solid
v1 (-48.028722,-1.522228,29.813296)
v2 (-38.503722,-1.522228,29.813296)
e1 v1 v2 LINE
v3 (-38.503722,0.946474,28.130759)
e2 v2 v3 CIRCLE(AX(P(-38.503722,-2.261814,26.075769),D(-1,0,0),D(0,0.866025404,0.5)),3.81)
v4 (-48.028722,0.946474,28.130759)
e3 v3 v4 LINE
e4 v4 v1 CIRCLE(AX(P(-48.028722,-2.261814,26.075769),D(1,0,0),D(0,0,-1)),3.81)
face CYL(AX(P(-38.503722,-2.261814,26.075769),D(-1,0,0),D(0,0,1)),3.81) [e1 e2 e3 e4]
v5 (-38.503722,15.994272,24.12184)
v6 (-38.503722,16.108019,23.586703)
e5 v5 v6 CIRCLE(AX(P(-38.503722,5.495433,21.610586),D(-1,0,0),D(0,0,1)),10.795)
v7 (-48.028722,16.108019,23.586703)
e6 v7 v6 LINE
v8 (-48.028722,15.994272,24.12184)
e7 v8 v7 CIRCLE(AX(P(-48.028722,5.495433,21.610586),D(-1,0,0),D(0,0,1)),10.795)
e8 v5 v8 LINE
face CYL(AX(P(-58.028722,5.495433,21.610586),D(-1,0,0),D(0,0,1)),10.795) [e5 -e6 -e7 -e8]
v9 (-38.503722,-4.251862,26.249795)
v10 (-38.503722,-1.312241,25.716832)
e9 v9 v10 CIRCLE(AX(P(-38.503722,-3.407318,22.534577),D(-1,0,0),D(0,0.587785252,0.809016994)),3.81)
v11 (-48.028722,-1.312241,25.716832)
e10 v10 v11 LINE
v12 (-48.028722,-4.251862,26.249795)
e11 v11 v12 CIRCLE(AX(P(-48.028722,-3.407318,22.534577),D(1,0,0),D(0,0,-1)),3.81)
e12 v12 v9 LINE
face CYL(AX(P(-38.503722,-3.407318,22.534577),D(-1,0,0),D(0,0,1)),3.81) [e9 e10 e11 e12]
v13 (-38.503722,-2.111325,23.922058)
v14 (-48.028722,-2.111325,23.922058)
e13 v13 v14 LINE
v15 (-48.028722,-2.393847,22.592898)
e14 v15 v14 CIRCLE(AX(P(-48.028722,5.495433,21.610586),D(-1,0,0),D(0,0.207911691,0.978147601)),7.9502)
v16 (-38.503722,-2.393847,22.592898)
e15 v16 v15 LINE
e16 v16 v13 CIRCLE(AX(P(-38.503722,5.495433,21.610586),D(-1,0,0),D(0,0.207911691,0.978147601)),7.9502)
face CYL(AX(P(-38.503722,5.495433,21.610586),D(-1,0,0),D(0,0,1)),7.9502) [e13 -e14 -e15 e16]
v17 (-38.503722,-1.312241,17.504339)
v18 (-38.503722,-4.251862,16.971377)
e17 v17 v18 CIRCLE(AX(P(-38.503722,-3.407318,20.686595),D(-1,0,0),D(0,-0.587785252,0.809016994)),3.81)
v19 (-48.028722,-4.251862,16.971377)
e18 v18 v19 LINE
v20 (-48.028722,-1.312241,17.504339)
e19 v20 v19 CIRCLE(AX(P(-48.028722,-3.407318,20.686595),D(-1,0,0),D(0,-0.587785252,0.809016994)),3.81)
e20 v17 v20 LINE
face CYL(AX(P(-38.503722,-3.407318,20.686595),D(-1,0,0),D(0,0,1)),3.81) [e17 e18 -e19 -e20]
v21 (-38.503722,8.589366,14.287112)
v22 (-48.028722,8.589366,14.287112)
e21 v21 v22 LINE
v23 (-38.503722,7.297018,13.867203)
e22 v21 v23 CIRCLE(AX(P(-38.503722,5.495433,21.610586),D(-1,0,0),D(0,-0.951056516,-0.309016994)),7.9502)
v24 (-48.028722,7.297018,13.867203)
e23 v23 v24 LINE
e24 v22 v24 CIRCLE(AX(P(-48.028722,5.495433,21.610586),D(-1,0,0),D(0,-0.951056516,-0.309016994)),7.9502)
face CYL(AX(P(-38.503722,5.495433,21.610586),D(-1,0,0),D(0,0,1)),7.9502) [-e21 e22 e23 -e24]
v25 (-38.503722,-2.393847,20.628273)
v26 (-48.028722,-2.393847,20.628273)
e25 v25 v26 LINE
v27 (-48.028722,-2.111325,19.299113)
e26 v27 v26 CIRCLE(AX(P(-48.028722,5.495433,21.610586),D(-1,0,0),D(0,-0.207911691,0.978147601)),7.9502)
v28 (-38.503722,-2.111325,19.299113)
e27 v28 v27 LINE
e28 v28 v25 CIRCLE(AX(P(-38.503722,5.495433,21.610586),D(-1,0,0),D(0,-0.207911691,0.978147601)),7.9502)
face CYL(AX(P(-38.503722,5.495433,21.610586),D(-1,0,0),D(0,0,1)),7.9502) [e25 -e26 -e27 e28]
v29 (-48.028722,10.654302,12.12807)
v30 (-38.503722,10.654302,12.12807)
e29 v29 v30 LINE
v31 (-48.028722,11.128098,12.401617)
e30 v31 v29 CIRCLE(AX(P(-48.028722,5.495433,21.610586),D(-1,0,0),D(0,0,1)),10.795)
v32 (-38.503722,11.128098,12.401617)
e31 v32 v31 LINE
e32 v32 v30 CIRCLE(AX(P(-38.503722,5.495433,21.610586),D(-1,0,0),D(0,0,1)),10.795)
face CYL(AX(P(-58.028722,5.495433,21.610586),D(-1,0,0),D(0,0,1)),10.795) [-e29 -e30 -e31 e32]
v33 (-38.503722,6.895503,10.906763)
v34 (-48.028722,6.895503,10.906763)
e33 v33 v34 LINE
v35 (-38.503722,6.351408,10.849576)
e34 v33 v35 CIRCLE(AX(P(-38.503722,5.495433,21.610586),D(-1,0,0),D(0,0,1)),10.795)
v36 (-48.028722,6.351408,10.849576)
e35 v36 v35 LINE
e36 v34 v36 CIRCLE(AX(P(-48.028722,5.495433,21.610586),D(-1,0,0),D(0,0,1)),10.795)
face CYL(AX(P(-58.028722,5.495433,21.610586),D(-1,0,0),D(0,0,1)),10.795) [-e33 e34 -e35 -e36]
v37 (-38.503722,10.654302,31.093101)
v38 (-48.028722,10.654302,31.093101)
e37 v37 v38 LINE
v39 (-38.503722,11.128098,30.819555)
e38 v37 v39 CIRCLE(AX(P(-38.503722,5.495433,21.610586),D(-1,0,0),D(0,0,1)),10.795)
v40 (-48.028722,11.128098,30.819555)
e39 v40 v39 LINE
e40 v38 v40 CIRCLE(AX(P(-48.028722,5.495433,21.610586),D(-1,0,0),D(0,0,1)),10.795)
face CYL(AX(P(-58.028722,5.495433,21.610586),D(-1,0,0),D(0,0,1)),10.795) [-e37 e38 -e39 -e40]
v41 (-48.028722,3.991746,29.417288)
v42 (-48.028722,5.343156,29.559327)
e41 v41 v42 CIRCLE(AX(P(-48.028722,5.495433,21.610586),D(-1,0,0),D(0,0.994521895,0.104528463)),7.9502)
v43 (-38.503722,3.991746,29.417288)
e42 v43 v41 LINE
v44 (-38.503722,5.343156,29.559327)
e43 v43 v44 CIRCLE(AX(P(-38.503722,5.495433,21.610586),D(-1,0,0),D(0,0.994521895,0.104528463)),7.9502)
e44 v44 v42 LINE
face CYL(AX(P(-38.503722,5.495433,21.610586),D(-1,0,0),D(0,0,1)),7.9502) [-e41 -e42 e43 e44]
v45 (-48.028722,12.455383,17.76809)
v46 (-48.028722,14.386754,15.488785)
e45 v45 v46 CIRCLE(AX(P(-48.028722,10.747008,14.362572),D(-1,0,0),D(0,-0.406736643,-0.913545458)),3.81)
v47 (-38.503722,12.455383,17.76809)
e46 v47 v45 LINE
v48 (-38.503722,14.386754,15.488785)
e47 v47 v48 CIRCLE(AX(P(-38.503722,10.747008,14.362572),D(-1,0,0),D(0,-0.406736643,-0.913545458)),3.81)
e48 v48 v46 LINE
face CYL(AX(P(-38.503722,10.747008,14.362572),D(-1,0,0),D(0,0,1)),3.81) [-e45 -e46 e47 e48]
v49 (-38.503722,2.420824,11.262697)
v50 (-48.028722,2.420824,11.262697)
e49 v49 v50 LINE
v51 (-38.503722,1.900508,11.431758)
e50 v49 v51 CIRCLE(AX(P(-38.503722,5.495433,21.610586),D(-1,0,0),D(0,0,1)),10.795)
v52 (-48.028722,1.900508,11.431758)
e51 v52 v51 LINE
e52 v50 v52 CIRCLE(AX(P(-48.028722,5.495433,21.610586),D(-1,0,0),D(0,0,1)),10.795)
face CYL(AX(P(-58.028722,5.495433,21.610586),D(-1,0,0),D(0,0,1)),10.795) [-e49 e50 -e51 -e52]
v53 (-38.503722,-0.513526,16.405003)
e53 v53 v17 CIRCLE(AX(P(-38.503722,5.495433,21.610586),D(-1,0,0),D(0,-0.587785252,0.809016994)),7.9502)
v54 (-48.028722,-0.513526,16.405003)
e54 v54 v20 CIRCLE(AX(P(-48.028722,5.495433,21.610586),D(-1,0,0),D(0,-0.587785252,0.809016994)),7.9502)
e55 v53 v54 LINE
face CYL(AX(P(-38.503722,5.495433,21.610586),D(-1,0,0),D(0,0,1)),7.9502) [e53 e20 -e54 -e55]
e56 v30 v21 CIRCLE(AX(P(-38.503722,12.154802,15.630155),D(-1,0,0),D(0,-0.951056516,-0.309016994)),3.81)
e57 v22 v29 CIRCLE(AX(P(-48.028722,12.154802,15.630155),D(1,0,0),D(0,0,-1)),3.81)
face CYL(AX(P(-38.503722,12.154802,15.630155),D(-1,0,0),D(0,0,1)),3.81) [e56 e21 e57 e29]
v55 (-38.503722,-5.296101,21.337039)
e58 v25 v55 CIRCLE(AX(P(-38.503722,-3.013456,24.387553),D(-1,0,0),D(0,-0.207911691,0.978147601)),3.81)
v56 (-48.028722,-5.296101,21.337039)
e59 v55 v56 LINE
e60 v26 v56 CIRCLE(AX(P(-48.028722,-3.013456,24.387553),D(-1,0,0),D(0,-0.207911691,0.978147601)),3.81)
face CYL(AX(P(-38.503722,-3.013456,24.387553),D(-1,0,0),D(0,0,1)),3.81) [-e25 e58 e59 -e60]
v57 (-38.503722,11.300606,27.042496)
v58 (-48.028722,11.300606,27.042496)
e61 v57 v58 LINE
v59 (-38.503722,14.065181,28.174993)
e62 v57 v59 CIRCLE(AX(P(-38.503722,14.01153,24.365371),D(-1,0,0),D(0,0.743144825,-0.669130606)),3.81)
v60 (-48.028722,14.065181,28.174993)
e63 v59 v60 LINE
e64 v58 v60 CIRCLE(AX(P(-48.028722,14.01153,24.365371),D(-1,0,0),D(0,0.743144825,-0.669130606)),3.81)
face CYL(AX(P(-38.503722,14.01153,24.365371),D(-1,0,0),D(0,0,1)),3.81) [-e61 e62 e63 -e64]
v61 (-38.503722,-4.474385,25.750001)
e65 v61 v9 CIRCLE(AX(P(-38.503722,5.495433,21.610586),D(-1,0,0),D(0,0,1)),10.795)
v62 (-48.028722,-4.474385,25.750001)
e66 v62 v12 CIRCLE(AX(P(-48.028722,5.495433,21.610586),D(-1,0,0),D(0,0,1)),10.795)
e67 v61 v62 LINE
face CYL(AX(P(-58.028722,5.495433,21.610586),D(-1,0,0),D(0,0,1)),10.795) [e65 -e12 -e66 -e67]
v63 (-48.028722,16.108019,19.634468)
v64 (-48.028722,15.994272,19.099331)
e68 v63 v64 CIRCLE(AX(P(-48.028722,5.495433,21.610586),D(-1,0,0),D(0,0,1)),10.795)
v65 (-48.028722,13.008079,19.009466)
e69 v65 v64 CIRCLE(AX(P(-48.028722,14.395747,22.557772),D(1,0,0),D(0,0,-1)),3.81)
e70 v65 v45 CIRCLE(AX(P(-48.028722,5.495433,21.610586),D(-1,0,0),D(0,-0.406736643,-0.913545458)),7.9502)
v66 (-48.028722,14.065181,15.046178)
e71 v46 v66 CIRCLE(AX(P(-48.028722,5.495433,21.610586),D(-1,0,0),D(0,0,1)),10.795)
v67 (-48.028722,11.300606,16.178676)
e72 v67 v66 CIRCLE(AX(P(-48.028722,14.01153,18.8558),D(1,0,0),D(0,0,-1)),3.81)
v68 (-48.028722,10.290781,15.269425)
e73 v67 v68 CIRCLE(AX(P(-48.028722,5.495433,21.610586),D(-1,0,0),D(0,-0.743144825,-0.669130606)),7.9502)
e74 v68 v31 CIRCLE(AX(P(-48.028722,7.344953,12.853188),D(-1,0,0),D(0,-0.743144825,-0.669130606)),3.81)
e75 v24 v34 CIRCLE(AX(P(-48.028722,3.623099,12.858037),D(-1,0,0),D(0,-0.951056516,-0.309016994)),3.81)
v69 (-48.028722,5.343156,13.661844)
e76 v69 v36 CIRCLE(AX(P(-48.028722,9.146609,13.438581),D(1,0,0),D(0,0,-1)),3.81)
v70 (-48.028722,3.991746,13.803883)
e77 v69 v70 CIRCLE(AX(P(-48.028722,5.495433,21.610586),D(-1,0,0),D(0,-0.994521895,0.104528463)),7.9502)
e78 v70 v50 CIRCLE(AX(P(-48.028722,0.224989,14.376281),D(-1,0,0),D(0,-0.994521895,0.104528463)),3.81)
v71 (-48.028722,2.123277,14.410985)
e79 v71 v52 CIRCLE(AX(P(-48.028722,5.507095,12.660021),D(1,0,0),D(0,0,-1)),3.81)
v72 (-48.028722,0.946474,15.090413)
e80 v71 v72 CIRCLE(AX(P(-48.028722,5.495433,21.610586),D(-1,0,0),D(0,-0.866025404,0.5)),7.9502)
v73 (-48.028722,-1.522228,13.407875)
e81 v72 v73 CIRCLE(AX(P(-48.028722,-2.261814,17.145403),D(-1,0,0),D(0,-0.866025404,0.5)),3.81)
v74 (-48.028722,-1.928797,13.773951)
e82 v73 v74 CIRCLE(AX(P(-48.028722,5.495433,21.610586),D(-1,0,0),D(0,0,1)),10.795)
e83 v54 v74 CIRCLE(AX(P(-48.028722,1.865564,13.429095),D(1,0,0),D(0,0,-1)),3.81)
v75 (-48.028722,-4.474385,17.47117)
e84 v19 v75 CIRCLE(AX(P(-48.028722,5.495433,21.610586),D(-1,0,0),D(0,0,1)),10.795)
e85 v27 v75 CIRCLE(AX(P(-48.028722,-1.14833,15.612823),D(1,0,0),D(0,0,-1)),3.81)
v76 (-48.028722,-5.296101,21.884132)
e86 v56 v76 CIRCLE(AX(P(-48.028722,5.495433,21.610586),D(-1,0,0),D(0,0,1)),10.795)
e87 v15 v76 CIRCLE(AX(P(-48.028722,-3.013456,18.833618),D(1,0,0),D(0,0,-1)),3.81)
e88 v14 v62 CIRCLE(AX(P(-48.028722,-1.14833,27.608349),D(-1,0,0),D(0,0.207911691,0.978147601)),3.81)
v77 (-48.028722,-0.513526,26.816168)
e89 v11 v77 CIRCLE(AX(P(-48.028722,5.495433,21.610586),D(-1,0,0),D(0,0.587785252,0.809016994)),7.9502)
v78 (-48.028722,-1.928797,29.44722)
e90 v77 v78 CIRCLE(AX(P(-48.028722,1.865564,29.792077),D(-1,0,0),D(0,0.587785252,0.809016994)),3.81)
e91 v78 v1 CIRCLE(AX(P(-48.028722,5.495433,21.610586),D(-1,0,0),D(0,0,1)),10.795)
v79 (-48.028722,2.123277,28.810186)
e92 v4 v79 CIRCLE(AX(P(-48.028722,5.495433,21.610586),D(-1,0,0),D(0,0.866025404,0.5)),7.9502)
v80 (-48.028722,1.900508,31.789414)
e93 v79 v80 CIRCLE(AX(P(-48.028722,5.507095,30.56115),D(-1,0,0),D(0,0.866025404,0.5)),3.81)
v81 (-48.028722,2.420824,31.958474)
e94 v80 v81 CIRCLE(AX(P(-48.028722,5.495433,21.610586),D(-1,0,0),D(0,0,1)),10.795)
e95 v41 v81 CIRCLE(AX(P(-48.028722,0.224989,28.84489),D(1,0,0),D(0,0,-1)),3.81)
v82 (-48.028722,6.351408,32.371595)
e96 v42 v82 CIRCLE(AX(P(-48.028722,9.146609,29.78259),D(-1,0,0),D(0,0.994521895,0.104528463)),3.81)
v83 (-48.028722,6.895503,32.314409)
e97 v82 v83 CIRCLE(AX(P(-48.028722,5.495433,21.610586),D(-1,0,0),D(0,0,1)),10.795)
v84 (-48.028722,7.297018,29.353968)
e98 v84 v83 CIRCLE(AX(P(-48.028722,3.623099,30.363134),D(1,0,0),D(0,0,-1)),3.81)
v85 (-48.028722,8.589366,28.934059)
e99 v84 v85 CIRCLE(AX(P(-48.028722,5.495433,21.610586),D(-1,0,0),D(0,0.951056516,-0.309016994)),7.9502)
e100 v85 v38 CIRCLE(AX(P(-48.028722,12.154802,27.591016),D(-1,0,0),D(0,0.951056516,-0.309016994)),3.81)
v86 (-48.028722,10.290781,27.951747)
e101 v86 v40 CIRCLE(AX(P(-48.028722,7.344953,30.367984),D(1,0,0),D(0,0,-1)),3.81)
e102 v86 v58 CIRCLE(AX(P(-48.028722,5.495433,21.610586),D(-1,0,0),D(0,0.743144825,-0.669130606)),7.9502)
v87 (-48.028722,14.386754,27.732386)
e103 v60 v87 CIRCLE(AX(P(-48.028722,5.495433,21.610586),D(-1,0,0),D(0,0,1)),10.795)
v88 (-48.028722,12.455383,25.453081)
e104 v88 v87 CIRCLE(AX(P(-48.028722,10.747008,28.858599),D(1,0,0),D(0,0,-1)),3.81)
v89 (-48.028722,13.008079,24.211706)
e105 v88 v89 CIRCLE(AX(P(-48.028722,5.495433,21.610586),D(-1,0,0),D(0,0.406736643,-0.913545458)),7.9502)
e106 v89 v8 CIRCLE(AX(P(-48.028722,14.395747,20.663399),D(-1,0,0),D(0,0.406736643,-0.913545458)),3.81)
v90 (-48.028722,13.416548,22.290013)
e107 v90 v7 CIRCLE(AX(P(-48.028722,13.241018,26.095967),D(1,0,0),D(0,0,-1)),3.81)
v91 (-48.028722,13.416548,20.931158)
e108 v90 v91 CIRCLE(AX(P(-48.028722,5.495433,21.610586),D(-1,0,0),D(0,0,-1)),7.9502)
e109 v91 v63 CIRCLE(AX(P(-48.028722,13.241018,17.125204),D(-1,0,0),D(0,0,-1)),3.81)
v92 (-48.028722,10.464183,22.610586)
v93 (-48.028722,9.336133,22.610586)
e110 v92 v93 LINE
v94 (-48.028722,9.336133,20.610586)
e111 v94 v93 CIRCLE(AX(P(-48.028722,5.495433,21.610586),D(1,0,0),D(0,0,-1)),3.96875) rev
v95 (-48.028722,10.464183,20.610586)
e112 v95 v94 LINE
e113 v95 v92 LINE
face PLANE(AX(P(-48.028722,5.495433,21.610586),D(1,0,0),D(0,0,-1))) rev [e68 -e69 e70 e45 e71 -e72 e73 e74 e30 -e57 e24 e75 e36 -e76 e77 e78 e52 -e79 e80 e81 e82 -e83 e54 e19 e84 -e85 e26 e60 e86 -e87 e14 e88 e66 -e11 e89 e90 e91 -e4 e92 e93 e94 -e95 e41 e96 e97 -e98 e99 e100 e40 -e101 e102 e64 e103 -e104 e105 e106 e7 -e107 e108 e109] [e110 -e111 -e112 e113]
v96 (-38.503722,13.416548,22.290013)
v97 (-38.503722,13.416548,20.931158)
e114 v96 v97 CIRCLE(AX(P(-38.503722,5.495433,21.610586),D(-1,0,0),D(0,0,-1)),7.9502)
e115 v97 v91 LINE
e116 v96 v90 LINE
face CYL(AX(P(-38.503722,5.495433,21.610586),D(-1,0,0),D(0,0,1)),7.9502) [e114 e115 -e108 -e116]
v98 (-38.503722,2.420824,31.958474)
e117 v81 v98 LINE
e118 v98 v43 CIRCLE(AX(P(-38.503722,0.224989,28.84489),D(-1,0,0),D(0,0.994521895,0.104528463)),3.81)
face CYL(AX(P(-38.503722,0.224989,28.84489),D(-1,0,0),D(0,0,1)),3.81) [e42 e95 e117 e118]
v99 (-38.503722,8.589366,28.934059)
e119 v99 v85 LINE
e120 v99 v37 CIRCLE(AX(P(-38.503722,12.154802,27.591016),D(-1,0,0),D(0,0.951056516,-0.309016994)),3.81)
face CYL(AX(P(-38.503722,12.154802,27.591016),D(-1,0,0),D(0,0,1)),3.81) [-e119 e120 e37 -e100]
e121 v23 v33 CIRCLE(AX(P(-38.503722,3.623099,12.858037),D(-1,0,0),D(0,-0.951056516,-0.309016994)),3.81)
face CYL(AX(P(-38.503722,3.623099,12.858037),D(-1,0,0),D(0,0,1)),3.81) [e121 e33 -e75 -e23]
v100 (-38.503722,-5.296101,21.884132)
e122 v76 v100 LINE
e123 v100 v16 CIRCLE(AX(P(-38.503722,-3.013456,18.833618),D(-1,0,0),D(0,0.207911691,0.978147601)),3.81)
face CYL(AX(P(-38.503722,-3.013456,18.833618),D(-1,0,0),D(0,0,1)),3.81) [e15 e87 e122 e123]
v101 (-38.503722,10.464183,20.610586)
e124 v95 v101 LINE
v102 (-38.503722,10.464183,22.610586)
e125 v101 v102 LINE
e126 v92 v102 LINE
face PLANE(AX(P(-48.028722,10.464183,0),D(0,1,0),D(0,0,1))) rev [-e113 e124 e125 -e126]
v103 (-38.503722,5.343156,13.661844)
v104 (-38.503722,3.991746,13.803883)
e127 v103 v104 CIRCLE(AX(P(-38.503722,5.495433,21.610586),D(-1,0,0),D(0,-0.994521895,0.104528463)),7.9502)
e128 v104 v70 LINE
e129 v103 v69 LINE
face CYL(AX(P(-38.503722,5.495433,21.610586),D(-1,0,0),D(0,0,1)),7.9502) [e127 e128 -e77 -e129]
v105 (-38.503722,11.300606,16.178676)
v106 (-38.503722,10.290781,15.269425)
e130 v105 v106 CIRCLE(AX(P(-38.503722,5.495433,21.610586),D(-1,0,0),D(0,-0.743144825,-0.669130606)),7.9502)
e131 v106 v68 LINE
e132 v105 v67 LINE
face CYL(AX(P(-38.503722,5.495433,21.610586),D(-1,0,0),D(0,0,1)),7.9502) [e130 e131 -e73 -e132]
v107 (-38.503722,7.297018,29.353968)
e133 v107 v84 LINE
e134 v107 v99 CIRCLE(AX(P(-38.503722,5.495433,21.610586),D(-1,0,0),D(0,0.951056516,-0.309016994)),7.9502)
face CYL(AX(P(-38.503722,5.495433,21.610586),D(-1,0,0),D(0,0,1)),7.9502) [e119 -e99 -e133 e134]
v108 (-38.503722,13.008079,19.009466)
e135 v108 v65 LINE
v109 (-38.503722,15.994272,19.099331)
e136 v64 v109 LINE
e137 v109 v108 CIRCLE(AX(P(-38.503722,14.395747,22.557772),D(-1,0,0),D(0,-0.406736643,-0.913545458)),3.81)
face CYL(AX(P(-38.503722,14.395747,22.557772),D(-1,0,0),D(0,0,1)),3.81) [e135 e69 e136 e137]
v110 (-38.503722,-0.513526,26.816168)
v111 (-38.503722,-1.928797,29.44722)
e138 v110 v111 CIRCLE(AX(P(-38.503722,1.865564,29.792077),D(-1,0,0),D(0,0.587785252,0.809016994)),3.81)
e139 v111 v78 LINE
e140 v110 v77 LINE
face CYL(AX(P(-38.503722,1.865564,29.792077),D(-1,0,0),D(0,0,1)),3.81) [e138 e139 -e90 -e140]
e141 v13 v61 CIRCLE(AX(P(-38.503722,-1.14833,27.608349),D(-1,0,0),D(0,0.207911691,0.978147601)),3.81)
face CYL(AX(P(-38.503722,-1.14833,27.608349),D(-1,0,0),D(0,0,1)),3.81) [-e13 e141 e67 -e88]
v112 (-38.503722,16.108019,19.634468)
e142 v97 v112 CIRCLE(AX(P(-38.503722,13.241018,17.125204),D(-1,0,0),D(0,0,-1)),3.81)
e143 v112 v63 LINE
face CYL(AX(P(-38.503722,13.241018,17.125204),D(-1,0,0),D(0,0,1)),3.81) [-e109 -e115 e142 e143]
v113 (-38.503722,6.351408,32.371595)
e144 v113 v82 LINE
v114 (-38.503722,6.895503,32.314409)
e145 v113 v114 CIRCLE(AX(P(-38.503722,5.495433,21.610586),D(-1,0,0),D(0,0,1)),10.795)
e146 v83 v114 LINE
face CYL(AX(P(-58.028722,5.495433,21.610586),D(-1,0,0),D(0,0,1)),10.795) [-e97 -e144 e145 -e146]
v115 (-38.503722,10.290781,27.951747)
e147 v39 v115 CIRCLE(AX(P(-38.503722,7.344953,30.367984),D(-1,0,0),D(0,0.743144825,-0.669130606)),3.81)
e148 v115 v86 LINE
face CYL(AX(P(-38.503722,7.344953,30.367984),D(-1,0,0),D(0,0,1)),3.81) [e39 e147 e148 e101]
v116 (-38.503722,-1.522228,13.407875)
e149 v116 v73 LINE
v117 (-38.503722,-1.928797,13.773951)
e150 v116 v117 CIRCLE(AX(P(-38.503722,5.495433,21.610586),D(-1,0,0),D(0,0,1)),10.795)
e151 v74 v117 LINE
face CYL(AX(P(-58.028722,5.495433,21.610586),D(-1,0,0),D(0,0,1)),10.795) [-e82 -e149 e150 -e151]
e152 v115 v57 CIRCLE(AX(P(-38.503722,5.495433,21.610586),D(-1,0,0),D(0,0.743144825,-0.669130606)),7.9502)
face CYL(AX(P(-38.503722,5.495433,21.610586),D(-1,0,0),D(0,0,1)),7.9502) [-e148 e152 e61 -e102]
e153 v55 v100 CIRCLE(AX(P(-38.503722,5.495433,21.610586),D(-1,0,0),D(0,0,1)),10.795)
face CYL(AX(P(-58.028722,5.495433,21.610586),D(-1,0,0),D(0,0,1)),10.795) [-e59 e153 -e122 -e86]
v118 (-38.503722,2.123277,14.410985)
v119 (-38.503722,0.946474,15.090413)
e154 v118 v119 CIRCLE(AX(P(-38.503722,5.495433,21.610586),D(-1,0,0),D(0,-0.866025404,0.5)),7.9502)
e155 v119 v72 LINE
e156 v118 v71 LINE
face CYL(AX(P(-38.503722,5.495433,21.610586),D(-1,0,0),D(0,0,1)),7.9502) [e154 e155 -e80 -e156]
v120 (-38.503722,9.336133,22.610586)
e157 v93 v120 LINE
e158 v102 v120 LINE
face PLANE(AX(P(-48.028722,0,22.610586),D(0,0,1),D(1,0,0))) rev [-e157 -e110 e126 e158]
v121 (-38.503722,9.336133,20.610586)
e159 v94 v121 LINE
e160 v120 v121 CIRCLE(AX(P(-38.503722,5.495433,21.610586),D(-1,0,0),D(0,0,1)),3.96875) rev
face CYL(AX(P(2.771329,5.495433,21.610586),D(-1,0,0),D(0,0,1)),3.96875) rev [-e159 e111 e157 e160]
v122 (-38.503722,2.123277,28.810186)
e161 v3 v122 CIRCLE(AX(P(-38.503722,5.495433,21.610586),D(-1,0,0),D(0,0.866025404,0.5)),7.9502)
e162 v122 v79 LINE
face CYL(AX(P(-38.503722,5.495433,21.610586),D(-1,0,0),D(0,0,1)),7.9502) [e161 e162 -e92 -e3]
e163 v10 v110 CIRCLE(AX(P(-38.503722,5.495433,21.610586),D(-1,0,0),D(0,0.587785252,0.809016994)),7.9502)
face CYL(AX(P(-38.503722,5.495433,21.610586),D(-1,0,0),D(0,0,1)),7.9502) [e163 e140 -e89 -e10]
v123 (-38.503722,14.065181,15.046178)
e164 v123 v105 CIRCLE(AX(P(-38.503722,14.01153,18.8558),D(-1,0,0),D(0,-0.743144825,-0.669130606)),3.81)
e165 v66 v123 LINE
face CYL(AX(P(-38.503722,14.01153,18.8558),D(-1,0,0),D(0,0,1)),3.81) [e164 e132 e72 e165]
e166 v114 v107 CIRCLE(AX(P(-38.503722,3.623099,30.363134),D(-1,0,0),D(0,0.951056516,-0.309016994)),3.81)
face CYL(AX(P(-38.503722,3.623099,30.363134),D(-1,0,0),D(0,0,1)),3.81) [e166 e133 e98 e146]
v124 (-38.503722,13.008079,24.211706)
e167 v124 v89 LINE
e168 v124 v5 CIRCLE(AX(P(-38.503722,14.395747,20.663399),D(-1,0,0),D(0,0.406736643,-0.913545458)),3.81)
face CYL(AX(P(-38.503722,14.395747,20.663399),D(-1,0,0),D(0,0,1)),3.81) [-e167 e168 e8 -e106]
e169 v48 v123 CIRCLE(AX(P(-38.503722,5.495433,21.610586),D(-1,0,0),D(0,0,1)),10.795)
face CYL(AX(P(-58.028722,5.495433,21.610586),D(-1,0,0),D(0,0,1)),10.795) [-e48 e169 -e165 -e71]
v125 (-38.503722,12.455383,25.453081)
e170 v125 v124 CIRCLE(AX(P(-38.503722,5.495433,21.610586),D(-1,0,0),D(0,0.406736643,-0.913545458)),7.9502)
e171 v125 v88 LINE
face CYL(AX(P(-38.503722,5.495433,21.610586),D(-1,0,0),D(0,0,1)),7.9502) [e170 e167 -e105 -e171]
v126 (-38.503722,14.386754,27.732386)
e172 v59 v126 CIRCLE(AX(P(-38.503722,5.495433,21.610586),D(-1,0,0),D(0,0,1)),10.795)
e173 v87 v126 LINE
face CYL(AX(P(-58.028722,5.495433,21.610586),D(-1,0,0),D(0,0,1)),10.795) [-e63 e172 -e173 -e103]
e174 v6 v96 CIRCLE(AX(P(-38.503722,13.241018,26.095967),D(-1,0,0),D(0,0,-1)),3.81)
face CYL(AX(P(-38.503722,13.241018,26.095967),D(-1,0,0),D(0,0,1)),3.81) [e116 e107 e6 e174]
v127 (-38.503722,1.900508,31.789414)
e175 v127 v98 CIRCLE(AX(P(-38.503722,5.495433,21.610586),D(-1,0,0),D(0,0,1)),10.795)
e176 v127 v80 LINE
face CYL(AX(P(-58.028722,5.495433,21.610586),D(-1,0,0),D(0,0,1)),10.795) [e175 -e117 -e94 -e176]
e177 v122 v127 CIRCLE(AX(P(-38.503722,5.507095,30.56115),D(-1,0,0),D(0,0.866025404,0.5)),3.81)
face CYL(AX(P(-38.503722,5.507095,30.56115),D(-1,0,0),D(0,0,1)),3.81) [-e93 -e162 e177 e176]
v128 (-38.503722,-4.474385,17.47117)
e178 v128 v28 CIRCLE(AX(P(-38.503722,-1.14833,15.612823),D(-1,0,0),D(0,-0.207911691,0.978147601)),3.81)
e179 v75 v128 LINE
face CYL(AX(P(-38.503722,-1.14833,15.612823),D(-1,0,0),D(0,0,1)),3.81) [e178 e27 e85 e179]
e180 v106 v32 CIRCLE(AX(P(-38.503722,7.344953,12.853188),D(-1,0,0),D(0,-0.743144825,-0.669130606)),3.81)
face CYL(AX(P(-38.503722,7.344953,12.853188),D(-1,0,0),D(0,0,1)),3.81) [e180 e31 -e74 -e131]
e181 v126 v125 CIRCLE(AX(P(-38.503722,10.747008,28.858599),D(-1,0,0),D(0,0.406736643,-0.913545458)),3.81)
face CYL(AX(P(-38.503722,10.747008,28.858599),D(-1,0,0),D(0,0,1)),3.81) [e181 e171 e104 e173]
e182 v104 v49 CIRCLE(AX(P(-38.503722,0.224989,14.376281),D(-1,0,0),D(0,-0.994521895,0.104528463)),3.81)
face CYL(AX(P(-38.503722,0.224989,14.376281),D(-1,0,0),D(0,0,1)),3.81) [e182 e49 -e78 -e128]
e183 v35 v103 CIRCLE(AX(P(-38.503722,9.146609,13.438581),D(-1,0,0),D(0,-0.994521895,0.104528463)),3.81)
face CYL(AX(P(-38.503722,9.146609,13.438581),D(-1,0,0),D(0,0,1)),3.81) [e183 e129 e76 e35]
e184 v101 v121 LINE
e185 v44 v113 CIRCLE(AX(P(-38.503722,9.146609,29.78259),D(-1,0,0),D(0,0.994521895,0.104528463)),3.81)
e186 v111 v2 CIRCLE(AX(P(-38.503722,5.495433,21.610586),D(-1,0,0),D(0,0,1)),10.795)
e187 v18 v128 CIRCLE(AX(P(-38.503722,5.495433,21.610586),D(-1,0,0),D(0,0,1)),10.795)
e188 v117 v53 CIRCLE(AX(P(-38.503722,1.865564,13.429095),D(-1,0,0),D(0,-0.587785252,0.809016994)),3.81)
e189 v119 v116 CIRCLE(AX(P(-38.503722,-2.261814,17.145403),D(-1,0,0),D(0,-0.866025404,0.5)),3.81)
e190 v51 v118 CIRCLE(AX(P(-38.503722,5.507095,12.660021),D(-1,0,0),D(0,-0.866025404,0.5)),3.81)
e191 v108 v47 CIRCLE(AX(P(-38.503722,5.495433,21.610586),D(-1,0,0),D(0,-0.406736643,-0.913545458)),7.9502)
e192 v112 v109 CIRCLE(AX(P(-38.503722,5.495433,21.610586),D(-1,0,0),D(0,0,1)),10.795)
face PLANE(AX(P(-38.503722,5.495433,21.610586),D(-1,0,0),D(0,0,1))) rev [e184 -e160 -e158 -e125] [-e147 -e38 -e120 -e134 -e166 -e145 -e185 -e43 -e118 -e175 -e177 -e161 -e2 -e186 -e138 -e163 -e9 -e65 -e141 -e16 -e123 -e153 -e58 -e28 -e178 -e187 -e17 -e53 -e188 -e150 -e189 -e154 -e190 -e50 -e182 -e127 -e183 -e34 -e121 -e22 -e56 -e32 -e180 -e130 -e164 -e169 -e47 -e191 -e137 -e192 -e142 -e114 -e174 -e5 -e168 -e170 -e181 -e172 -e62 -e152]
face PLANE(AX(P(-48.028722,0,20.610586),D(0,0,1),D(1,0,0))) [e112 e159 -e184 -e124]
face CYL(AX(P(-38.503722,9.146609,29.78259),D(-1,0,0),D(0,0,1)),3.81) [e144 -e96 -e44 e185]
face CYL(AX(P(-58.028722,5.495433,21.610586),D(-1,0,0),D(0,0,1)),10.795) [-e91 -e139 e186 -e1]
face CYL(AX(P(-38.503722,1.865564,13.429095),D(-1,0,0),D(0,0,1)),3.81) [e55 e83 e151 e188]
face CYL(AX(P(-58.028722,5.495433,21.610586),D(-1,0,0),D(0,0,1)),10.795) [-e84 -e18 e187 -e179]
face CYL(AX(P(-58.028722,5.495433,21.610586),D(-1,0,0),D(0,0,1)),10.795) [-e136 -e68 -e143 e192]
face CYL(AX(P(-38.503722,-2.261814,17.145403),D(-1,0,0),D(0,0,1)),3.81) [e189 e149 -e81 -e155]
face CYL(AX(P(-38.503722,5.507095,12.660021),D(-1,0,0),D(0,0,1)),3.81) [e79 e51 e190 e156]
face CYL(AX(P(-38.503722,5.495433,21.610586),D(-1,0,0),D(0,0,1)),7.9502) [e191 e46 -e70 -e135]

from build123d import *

# Parameters (mm, degrees)
SPUR_START             = -48.028721504
SPUR_GEAR_AI_OUTLINE_R = 3.96875
SPUR_GEAR_AI_DEPTH     = 9.525
CUT_EXTRUDE1_DEPTH     = 38.391363975


# Read off the part's stored shape, not the designer's step: spur gear_ai
with BuildPart() as part:
    # spur gear_ai outline → spur gear_ai (new body)
    with BuildSketch(Plane.YZ.offset(SPUR_START)):
        with BuildLine():
            ThreePointArc((14.065180693, 15.046177845), (14.228771479, 15.265443857), (14.386753515, 15.488784863))
            ThreePointArc((14.386753515, 15.488784863), (13.653794557, 16.82563811), (12.455383467, 17.768090388))
            ThreePointArc((12.455383467, 17.768090388), (12.758302122, 18.376947995), (13.008079359, 19.009465686))
            ThreePointArc((13.008079359, 19.009465686), (14.510351432, 18.74949635), (15.994272276, 19.099331116))
            ThreePointArc((15.994272276, 19.099331116), (16.054536374, 19.366178952), (16.108019174, 19.634468198))
            ThreePointArc((16.108019174, 19.634468198), (14.894680646, 20.557623143), (13.416547762, 20.931158437))
            ThreePointArc((13.416547762, 20.931158437), (13.445633024, 21.610585655), (13.416547762, 22.290012873))
            ThreePointArc((13.416547762, 22.290012873), (14.894680646, 22.663548167), (16.108019174, 23.586703112))
            ThreePointArc((16.108019174, 23.586703112), (16.054536374, 23.854992358), (15.994272276, 24.121840194))
            ThreePointArc((15.994272276, 24.121840194), (14.510351432, 24.47167496), (13.008079359, 24.211705624))
            ThreePointArc((13.008079359, 24.211705624), (12.758302122, 24.844223315), (12.455383467, 25.453080922))
            ThreePointArc((12.455383467, 25.453080922), (13.653794557, 26.3955332), (14.386753515, 27.732386447))
            ThreePointArc((14.386753515, 27.732386447), (14.228771479, 27.955727454), (14.065180693, 28.174993465))
            ThreePointArc((14.065180693, 28.174993465), (12.567260927, 27.891018444), (11.300606153, 27.042495538))
            ThreePointArc((11.300606153, 27.042495538), (10.815155171, 27.518735647), (10.290780511, 27.951746631))
            ThreePointArc((10.290780511, 27.951746631), (11.002253642, 29.300157333), (11.128097767, 30.81955481))
            ThreePointArc((11.128097767, 30.81955481), (10.892933024, 30.959329889), (10.654301883, 31.093100991))
            ThreePointArc((10.654301883, 31.093100991), (9.401387132, 30.224418043), (8.589365776, 28.934058886))
            ThreePointArc((8.589365776, 28.934058886), (7.952179933, 29.171675171), (7.29701841, 29.353968))
            ThreePointArc((7.29701841, 29.353968), (7.398533415, 30.875184664), (6.895503115, 32.314408745))
            ThreePointArc((6.895503115, 32.314408745), (6.623817785, 32.346449516), (6.351407781, 32.371595469))
            ThreePointArc((6.351407781, 32.371595469), (5.560138388, 31.068407768), (5.343156318, 29.559327181))
            ThreePointArc((5.343156318, 29.559327181), (4.664410836, 29.517233628), (3.991745829, 29.417288215))
            ThreePointArc((3.991745829, 29.417288215), (3.465749841, 30.848278661), (2.420823624, 31.958474427))
            ThreePointArc((2.420823624, 31.958474427), (2.15959457, 31.877240748), (1.900507868, 31.789413589))
            ThreePointArc((1.900507868, 31.789413589), (1.707701498, 30.277054127), (2.123276886, 28.810185853))
            ThreePointArc((2.123276886, 28.810185853), (1.520333024, 28.49566082), (0.946474424, 28.130758636))
            ThreePointArc((0.946474424, 28.130758636), (-0.116083071, 29.224091616), (-1.522227969, 29.813296133))
            ThreePointArc((-1.522227969, 29.813296133), (-1.727831871, 29.632834046), (-1.928796828, 29.447219888))
            ThreePointArc((-1.928796828, 29.447219888), (-1.4898022, 27.987189356), (-0.513526115, 26.816168245))
            ThreePointArc((-0.513526115, 26.816168245), (-0.936413884, 26.283595967), (-1.312240712, 25.716831914))
            ThreePointArc((-1.312240712, 25.716831914), (-2.727633872, 26.283460223), (-4.251862224, 26.249794677))
            ThreePointArc((-4.251862224, 26.249794677), (-4.366290191, 26.001307717), (-4.474384734, 25.750000935))
            ThreePointArc((-4.474384734, 25.750000935), (-3.479495269, 24.594751875), (-2.11132549, 23.922058116))
            ThreePointArc((-2.11132549, 23.922058116), (-2.281036031, 23.263525179), (-2.393847214, 22.59289791))
            ThreePointArc((-2.393847214, 22.59289791), (-3.917341702, 22.534846366), (-5.296100578, 21.884131836))
            ThreePointArc((-5.296100578, 21.884131836), (-5.299566976, 21.610585655), (-5.296100578, 21.337039474))
            ThreePointArc((-5.296100578, 21.337039474), (-3.917341702, 20.686324945), (-2.393847214, 20.6282734))
            ThreePointArc((-2.393847214, 20.6282734), (-2.281036031, 19.957646131), (-2.11132549, 19.299113194))
            ThreePointArc((-2.11132549, 19.299113194), (-3.479495269, 18.626419435), (-4.474384734, 17.471170375))
            ThreePointArc((-4.474384734, 17.471170375), (-4.366290191, 17.219863593), (-4.251862224, 16.971376633))
            ThreePointArc((-4.251862224, 16.971376633), (-2.727633872, 16.937711087), (-1.312240712, 17.504339396))
            ThreePointArc((-1.312240712, 17.504339396), (-0.936413884, 16.937575343), (-0.513526115, 16.405003065))
            ThreePointArc((-0.513526115, 16.405003065), (-1.4898022, 15.233981954), (-1.928796828, 13.773951422))
            ThreePointArc((-1.928796828, 13.773951422), (-1.727831871, 13.588337264), (-1.522227969, 13.407875177))
            ThreePointArc((-1.522227969, 13.407875177), (-0.116083071, 13.997079694), (0.946474424, 15.090412674))
            ThreePointArc((0.946474424, 15.090412674), (1.520333024, 14.72551049), (2.123276886, 14.410985457))
            ThreePointArc((2.123276886, 14.410985457), (1.707701498, 12.944117183), (1.900507868, 11.431757721))
            ThreePointArc((1.900507868, 11.431757721), (2.15959457, 11.343930562), (2.420823624, 11.262696883))
            ThreePointArc((2.420823624, 11.262696883), (3.465749841, 12.372892649), (3.991745829, 13.803883095))
            ThreePointArc((3.991745829, 13.803883095), (4.664410836, 13.703937682), (5.343156318, 13.661844129))
            ThreePointArc((5.343156318, 13.661844129), (5.560138388, 12.152763542), (6.351407781, 10.849575841))
            ThreePointArc((6.351407781, 10.849575841), (6.623817785, 10.874721795), (6.895503115, 10.906762565))
            ThreePointArc((6.895503115, 10.906762565), (7.398533415, 12.345986646), (7.29701841, 13.86720331))
            ThreePointArc((7.29701841, 13.86720331), (7.952179933, 14.049496139), (8.589365776, 14.287112424))
            ThreePointArc((8.589365776, 14.287112424), (9.401387132, 12.996753267), (10.654301883, 12.128070319))
            ThreePointArc((10.654301883, 12.128070319), (10.892933024, 12.261841421), (11.128097767, 12.4016165))
            ThreePointArc((11.128097767, 12.4016165), (11.002253642, 13.921013977), (10.290780511, 15.269424679))
            ThreePointArc((10.290780511, 15.269424679), (10.815155171, 15.702435663), (11.300606153, 16.178675772))
            ThreePointArc((11.300606153, 16.178675772), (12.567260927, 15.330152866), (14.065180693, 15.046177845))
        make_face()
        with Locations((5.495433024, 21.610585655)):
            Circle(SPUR_GEAR_AI_OUTLINE_R, mode=Mode.SUBTRACT)
    extrude(amount=SPUR_GEAR_AI_DEPTH)

    # Sketch1 → Cut-Extrude1 (cut, through all)
    with BuildSketch(Plane(origin=(-38.503721504, 0, 0), x_dir=(0, 0, -1), z_dir=(1, 0, 0))):
        with BuildLine():
            Line((-20.610585655, 9.336133034), (-20.610585655, 10.464183024))
            Line((-20.610585655, 10.464183024), (-22.610585655, 10.464183024))
            Line((-22.610585655, 10.464183024), (-22.610585655, 9.336133034))
            ThreePointArc((-22.610585655, 9.336133034), (-21.610585655, 9.464183024), (-20.610585655, 9.336133034))
        make_face()
    extrude(amount=-CUT_EXTRUDE1_DEPTH, mode=Mode.SUBTRACT)


solid = part.part
